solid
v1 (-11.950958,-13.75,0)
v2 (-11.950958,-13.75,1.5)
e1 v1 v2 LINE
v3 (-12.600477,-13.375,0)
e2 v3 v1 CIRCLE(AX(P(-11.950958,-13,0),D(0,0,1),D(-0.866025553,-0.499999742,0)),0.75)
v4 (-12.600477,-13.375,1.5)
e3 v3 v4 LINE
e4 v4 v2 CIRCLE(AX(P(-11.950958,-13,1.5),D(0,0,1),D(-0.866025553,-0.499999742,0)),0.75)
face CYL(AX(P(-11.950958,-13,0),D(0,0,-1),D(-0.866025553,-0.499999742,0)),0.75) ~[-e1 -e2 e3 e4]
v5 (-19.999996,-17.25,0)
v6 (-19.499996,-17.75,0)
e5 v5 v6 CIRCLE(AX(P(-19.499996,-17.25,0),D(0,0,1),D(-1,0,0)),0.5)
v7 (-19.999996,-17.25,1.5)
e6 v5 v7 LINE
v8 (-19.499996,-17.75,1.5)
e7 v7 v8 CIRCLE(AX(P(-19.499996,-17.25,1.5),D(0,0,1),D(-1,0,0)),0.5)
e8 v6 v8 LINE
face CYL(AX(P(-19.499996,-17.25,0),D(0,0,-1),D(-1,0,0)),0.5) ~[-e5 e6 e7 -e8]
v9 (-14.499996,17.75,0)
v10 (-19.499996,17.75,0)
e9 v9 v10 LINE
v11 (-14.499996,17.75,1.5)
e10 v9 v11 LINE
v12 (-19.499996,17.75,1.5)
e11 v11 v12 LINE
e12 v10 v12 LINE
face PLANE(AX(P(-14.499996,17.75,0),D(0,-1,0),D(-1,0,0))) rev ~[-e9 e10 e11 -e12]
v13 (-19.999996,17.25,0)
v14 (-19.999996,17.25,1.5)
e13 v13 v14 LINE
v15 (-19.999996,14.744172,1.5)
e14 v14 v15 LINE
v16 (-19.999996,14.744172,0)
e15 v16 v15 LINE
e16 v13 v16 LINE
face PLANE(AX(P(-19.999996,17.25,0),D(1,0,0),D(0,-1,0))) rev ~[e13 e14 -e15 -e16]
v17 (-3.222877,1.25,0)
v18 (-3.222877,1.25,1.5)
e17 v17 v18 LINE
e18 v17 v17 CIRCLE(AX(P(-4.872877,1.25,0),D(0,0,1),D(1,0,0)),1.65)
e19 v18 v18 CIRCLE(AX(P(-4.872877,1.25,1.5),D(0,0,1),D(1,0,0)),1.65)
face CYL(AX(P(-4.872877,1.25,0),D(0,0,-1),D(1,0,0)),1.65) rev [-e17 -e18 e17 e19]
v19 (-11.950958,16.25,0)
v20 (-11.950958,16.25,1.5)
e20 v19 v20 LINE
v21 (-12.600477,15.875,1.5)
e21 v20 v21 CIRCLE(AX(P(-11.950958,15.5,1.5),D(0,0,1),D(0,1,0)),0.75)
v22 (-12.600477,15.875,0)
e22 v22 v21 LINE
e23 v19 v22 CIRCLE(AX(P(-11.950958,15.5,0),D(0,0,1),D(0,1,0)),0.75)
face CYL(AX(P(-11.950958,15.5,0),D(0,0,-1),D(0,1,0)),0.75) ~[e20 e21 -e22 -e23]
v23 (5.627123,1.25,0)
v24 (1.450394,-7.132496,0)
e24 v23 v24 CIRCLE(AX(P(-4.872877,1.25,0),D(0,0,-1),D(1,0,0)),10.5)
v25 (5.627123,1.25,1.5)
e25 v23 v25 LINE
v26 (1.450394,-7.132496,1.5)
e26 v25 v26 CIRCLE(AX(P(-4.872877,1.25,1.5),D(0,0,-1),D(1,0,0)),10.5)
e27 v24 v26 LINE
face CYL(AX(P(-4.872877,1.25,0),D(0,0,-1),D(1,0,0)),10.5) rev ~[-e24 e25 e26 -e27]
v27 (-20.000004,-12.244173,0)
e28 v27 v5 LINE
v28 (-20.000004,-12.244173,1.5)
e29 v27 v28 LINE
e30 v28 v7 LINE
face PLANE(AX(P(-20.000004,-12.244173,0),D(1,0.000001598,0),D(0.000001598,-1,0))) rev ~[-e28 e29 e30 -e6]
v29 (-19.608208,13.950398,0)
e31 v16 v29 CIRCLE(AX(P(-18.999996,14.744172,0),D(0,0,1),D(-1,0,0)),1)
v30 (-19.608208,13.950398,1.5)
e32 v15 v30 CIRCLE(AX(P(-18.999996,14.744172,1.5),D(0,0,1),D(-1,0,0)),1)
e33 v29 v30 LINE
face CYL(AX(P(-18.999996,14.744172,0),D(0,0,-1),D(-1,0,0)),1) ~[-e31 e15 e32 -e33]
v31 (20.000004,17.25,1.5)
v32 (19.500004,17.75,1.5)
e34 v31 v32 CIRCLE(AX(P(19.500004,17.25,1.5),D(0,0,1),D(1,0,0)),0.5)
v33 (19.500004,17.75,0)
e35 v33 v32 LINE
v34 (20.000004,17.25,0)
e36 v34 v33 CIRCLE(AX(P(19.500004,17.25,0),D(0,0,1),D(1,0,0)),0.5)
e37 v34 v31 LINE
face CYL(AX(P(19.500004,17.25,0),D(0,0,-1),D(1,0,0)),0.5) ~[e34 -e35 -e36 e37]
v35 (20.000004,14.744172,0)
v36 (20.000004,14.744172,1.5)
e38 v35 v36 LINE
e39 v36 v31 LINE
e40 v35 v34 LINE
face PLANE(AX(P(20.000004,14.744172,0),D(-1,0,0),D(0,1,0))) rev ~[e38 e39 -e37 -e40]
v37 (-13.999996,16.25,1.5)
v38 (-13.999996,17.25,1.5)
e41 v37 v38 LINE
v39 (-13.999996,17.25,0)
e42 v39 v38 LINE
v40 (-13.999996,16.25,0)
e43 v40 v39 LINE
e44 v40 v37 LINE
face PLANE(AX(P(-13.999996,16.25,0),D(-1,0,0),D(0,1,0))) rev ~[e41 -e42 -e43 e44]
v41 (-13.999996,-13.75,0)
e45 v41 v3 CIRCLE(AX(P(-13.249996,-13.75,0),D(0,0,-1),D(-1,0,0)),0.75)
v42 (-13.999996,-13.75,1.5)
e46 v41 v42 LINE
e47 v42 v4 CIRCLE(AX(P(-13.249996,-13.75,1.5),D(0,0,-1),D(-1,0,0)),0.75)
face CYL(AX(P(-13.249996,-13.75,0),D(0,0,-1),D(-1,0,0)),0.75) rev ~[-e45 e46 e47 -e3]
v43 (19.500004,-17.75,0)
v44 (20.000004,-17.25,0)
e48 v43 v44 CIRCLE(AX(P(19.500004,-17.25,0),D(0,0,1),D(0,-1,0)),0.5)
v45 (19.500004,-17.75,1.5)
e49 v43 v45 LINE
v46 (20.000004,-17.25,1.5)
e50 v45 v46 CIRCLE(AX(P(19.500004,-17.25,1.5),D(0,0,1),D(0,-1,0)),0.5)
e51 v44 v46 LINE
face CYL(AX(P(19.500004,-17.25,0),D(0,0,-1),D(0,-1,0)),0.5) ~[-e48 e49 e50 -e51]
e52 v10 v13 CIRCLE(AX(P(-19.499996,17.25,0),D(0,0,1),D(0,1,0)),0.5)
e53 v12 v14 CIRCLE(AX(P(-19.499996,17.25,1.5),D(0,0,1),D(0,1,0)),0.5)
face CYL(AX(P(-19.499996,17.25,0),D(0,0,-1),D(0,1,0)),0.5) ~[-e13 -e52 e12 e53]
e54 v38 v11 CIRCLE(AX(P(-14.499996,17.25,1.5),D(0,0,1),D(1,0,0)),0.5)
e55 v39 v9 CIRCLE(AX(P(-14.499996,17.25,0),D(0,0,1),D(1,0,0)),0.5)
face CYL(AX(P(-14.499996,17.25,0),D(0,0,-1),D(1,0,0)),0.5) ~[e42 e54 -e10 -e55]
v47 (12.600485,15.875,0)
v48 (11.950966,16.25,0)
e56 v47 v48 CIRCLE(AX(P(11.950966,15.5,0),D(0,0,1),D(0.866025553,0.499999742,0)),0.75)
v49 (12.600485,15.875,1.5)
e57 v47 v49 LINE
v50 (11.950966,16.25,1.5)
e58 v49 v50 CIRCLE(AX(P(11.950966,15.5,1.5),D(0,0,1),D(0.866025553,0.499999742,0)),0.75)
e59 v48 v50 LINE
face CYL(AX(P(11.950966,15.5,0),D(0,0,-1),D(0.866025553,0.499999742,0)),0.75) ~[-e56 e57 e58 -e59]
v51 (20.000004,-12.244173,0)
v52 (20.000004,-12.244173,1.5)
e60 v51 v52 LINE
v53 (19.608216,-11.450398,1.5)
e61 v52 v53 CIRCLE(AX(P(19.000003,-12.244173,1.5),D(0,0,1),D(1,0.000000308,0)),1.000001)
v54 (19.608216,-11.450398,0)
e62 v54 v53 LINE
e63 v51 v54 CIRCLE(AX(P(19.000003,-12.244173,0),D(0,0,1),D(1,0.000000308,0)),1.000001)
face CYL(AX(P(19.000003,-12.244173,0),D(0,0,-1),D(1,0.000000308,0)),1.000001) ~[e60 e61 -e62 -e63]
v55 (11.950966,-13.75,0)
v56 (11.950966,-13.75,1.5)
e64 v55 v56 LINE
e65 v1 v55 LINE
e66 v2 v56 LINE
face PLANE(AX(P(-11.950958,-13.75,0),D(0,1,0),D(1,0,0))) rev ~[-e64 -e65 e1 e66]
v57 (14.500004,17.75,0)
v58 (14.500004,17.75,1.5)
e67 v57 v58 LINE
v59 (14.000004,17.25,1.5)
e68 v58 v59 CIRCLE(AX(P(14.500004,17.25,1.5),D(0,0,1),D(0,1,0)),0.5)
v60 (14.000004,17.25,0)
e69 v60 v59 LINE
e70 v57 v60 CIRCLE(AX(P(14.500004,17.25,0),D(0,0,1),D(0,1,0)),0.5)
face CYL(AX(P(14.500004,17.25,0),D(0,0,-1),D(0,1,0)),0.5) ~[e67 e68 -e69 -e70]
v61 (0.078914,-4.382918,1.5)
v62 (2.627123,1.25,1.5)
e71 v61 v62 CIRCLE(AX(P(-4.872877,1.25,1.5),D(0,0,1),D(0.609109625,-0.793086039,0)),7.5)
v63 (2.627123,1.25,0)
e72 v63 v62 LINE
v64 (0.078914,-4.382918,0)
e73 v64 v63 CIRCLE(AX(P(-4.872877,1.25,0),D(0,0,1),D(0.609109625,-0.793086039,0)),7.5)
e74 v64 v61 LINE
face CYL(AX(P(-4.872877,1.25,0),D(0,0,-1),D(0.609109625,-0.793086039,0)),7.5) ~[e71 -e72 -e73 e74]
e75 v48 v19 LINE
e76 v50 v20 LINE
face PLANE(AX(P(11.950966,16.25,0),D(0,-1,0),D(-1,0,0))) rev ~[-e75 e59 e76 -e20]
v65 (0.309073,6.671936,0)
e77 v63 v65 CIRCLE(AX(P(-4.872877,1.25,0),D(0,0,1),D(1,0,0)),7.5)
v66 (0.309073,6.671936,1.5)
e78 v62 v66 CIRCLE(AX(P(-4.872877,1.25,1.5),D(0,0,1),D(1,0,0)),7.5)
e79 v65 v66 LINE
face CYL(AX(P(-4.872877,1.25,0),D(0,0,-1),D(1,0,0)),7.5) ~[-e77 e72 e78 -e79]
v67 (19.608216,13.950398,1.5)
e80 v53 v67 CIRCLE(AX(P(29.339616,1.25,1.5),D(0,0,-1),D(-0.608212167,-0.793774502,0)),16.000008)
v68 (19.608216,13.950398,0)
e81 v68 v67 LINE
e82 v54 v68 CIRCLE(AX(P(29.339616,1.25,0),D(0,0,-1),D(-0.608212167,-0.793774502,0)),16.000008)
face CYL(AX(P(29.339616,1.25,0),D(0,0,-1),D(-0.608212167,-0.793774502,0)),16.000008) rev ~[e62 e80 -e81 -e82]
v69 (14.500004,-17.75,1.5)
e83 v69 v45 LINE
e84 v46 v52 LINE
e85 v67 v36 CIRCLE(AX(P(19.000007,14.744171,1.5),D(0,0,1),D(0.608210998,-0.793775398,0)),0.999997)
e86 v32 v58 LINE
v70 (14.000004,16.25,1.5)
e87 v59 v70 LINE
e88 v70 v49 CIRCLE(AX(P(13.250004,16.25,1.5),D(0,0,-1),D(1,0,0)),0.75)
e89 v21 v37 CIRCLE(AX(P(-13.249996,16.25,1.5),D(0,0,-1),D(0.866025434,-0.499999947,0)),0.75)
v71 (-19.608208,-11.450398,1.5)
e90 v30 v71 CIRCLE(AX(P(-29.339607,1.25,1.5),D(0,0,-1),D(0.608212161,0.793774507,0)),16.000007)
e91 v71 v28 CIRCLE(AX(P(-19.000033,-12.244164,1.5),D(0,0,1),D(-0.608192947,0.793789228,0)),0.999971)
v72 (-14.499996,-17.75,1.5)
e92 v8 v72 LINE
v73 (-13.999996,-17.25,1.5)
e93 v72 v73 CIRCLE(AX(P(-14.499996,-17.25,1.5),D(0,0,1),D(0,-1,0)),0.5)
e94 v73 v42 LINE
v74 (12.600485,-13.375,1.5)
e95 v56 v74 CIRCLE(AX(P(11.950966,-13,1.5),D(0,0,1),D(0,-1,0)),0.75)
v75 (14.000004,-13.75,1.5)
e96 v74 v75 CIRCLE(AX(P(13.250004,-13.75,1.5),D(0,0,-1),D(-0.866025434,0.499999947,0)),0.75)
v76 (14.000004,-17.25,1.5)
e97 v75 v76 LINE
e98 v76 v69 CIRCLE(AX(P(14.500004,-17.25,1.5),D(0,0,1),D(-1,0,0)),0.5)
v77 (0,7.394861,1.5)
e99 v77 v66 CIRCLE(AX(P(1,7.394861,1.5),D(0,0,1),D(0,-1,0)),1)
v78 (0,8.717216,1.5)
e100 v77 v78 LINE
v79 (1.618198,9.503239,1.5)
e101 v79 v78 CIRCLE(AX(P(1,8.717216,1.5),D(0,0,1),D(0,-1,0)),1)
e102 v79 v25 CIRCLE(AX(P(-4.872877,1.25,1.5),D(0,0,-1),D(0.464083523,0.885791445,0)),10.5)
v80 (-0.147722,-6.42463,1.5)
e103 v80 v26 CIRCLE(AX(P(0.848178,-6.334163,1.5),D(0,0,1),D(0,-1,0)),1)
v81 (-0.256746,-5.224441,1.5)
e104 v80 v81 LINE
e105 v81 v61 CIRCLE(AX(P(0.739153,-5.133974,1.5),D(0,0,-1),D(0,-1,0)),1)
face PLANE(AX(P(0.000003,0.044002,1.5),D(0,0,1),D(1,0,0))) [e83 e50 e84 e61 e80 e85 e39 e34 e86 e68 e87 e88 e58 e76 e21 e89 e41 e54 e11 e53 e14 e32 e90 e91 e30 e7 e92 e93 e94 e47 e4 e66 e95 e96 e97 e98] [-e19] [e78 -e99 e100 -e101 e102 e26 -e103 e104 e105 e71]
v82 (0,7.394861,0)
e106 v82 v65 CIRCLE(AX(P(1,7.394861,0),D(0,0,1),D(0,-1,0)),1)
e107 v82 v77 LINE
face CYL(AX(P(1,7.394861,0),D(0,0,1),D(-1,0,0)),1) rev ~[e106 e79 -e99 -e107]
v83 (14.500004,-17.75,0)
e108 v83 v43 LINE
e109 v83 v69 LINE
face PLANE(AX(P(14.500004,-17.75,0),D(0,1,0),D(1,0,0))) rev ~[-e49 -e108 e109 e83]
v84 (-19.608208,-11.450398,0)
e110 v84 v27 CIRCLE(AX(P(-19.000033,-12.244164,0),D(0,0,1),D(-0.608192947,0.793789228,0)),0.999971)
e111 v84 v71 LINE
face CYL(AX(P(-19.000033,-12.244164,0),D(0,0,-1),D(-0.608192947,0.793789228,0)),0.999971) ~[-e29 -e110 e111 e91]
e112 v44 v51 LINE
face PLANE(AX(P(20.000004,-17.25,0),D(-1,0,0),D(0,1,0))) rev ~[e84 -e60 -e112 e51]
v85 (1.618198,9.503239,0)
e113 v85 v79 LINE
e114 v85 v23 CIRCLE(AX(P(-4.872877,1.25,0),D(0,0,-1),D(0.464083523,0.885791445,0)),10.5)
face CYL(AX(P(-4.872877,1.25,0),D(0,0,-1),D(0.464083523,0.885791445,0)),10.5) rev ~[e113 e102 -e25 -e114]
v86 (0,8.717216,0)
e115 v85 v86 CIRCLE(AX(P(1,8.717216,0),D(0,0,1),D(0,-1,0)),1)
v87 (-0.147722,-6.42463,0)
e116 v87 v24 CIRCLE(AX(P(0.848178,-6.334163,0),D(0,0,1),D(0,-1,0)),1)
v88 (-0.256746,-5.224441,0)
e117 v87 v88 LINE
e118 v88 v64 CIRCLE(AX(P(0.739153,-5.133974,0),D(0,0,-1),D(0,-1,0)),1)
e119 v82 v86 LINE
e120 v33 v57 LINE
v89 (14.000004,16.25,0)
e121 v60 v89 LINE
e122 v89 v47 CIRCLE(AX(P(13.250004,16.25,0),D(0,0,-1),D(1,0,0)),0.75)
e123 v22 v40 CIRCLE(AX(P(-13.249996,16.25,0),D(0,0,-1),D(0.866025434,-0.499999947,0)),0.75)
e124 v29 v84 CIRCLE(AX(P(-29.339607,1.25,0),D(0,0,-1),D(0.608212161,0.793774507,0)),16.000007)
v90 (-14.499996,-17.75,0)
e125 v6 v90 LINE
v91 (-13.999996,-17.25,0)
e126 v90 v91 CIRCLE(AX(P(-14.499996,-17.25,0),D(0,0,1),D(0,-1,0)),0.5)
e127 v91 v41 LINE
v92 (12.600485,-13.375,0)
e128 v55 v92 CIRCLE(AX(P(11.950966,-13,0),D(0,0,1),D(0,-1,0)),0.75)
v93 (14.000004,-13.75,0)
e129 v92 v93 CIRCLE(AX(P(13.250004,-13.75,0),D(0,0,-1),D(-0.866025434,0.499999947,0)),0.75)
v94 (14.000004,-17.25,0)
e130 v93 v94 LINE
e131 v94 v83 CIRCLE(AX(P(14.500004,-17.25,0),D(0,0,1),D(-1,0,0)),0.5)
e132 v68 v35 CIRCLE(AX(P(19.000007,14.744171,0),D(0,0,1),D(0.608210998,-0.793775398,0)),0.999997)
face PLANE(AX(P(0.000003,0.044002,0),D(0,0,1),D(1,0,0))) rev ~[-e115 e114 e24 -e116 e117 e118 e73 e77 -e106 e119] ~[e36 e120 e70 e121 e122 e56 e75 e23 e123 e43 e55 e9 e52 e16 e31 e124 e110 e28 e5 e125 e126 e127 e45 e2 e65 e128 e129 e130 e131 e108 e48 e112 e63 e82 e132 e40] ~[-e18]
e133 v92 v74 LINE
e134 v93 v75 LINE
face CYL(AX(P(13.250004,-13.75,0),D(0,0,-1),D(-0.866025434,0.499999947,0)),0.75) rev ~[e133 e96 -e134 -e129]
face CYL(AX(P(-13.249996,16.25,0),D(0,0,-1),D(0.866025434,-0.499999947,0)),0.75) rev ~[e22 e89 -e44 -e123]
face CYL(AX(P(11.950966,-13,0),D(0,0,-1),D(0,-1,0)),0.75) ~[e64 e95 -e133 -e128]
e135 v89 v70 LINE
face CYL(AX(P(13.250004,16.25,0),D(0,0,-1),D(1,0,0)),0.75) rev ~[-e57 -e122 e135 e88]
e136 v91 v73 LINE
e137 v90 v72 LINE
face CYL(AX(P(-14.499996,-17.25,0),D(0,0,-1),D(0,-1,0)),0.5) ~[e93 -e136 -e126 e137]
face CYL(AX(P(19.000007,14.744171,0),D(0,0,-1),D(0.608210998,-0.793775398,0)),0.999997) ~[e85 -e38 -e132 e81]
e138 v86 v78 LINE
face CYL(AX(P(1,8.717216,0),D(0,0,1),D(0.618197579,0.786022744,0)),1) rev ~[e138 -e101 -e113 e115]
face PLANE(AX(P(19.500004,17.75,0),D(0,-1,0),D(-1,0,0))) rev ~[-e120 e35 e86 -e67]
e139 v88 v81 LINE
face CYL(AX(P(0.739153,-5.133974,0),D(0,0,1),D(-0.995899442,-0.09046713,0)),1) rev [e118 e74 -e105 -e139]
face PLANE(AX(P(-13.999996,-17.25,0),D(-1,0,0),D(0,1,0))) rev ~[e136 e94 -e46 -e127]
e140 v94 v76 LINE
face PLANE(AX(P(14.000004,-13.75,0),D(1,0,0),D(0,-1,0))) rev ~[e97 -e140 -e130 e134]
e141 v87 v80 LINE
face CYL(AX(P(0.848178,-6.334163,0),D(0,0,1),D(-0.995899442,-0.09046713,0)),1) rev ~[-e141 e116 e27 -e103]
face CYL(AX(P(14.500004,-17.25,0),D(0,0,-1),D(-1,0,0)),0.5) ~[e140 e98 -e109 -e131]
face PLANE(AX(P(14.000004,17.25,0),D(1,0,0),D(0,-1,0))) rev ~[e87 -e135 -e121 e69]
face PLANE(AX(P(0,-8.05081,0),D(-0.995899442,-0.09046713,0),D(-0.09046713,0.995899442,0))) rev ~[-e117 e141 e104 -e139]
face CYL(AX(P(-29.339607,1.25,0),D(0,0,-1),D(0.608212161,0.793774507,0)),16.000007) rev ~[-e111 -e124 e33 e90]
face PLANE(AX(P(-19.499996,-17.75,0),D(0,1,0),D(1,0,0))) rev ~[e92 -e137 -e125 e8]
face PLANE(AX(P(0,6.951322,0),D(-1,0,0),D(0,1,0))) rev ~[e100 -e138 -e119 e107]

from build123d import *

# Parameters (mm, degrees)
F0_R     = 1.65
F1_DEPTH = 1.5
F2_R     = 1


# Not quite as in the source:
# - ends of sketch curves that miss each other by under 0.0002 mm in the source are joined


with BuildPart() as f1:
    # F0 (on Top) → F1 (new body)
    with BuildSketch(Plane.XY):
        with BuildLine():
            ThreePointArc((19.6082164698, -11.4503983868), (13.339608, 1.2499996959), (19.608215987, 13.9503980169))
            ThreePointArc((19.608215987, 13.9503980169), (19.8967236619, 14.3015730303), (20.000004, 14.744172))
            Line((20.000004, 14.744172), (20.000004, 17.25))
            ThreePointArc((20.000004, 17.25), (19.8535573906, 17.6035533906), (19.500004, 17.75))
            Line((19.500004, 17.75), (14.500004, 17.75))
            ThreePointArc((14.500004, 17.75), (14.1464506094, 17.6035533906), (14.000004, 17.25))
            Line((14.000004, 17.25), (14.000004, 16.25))
            ThreePointArc((14.000004, 16.25), (13.4441182966, 15.5255556337), (12.6004849604, 15.8749999771))
            ThreePointArc((12.6004849604, 15.8749999771), (12.3259659886, 16.1495190594), (11.950966, 16.25))
            Line((11.950966, 16.25), (-11.950958, 16.25))
            ThreePointArc((-11.950958, 16.25), (-12.3259579886, 16.1495190594), (-12.6004770396, 15.8750000229))
            ThreePointArc((-12.6004770396, 15.8750000229), (-13.4441102966, 15.5255556337), (-13.999996, 16.25))
            Line((-13.999996, 16.25), (-13.999996, 17.25))
            ThreePointArc((-13.999996, 17.25), (-14.1464426094, 17.6035533906), (-14.499996, 17.75))
            Line((-14.499996, 17.75), (-19.499996, 17.75))
            ThreePointArc((-19.499996, 17.75), (-19.8535493906, 17.6035533906), (-19.999996, 17.25))
            Line((-19.999996, 17.25), (-19.999996, 14.744172))
            ThreePointArc((-19.999996, 14.744172), (-19.8967156619, 14.3015730303), (-19.6082083041, 13.9503976031))
            ThreePointArc((-19.6082083041, 13.9503976031), (-13.3396, 1.2499996959), (-19.6082084698, -11.4503983868))
            ThreePointArc((-19.6082084698, -11.4503983868), (-19.8967227718, -11.8015703601), (-20.000004, -12.244173))
            Line((-20.000004, -12.244173), (-19.999996, -17.25))
            ThreePointArc((-19.999996, -17.25), (-19.8535493906, -17.6035533906), (-19.499996, -17.75))
            Line((-19.499996, -17.75), (-14.499996, -17.75))
            ThreePointArc((-14.499996, -17.75), (-14.1464426094, -17.6035533906), (-13.999996, -17.25))
            Line((-13.999996, -17.25), (-13.999996, -13.75))
            ThreePointArc((-13.999996, -13.75), (-13.4441102966, -13.0255556337), (-12.6004769604, -13.3749999771))
            ThreePointArc((-12.6004769604, -13.3749999771), (-12.3259579886, -13.6495190594), (-11.950958, -13.75))
            Line((-11.950958, -13.75), (11.950966, -13.75))
            ThreePointArc((11.950966, -13.75), (12.3259659886, -13.6495190594), (12.6004850396, -13.3750000229))
            ThreePointArc((12.6004850396, -13.3750000229), (13.4441182966, -13.0255556337), (14.000004, -13.75))
            Line((14.000004, -13.75), (14.000004, -17.25))
            ThreePointArc((14.000004, -17.25), (14.1464506094, -17.6035533906), (14.500004, -17.75))
            Line((14.500004, -17.75), (19.500004, -17.75))
            ThreePointArc((19.500004, -17.75), (19.8535573906, -17.6035533906), (20.000004, -17.25))
            Line((20.000004, -17.25), (20.000004, -12.244173))
            ThreePointArc((20.000004, -12.244173), (19.8967236619, -11.8015740303), (19.6082164698, -11.4503983868))
        make_face()
        with Locations((-4.8728769961, 1.25)):
            Circle(F0_R, mode=Mode.SUBTRACT)
        with BuildLine():
            ThreePointArc((-0.3045548123, -4.6981452929), (1.8543964627, -2.0656887385), (2.6271230039, 1.25))
            ThreePointArc((2.6271230039, 1.25), (1.938751938, 4.3887435806), (0, 6.9513217574))
            Line((0, 6.9513217574), (0, 10.550810168))
            ThreePointArc((0, 10.550810168), (4.1108641083, 6.6852916914), (5.6271230039, 1.25))
            ThreePointArc((5.6271230039, 1.25), (4.1108641083, -4.1852916914), (0, -8.050810168))
            Line((0, -8.050810168), (-0.3045548123, -4.6981452929))
        make_face(mode=Mode.SUBTRACT)
    extrude(amount=F1_DEPTH)

    # F2
    f2_edges = [f1.edges().sort_by_distance(p)[0] for p in [
        (0, 10.55081, 0.75),
        (-0.304555, -4.698145, 0.75),
        (0, -8.05081, 0.75),
        (0, 6.951322, 0.75),
    ]]
    fillet(f2_edges, radius=F2_R)


solid = f1.part
